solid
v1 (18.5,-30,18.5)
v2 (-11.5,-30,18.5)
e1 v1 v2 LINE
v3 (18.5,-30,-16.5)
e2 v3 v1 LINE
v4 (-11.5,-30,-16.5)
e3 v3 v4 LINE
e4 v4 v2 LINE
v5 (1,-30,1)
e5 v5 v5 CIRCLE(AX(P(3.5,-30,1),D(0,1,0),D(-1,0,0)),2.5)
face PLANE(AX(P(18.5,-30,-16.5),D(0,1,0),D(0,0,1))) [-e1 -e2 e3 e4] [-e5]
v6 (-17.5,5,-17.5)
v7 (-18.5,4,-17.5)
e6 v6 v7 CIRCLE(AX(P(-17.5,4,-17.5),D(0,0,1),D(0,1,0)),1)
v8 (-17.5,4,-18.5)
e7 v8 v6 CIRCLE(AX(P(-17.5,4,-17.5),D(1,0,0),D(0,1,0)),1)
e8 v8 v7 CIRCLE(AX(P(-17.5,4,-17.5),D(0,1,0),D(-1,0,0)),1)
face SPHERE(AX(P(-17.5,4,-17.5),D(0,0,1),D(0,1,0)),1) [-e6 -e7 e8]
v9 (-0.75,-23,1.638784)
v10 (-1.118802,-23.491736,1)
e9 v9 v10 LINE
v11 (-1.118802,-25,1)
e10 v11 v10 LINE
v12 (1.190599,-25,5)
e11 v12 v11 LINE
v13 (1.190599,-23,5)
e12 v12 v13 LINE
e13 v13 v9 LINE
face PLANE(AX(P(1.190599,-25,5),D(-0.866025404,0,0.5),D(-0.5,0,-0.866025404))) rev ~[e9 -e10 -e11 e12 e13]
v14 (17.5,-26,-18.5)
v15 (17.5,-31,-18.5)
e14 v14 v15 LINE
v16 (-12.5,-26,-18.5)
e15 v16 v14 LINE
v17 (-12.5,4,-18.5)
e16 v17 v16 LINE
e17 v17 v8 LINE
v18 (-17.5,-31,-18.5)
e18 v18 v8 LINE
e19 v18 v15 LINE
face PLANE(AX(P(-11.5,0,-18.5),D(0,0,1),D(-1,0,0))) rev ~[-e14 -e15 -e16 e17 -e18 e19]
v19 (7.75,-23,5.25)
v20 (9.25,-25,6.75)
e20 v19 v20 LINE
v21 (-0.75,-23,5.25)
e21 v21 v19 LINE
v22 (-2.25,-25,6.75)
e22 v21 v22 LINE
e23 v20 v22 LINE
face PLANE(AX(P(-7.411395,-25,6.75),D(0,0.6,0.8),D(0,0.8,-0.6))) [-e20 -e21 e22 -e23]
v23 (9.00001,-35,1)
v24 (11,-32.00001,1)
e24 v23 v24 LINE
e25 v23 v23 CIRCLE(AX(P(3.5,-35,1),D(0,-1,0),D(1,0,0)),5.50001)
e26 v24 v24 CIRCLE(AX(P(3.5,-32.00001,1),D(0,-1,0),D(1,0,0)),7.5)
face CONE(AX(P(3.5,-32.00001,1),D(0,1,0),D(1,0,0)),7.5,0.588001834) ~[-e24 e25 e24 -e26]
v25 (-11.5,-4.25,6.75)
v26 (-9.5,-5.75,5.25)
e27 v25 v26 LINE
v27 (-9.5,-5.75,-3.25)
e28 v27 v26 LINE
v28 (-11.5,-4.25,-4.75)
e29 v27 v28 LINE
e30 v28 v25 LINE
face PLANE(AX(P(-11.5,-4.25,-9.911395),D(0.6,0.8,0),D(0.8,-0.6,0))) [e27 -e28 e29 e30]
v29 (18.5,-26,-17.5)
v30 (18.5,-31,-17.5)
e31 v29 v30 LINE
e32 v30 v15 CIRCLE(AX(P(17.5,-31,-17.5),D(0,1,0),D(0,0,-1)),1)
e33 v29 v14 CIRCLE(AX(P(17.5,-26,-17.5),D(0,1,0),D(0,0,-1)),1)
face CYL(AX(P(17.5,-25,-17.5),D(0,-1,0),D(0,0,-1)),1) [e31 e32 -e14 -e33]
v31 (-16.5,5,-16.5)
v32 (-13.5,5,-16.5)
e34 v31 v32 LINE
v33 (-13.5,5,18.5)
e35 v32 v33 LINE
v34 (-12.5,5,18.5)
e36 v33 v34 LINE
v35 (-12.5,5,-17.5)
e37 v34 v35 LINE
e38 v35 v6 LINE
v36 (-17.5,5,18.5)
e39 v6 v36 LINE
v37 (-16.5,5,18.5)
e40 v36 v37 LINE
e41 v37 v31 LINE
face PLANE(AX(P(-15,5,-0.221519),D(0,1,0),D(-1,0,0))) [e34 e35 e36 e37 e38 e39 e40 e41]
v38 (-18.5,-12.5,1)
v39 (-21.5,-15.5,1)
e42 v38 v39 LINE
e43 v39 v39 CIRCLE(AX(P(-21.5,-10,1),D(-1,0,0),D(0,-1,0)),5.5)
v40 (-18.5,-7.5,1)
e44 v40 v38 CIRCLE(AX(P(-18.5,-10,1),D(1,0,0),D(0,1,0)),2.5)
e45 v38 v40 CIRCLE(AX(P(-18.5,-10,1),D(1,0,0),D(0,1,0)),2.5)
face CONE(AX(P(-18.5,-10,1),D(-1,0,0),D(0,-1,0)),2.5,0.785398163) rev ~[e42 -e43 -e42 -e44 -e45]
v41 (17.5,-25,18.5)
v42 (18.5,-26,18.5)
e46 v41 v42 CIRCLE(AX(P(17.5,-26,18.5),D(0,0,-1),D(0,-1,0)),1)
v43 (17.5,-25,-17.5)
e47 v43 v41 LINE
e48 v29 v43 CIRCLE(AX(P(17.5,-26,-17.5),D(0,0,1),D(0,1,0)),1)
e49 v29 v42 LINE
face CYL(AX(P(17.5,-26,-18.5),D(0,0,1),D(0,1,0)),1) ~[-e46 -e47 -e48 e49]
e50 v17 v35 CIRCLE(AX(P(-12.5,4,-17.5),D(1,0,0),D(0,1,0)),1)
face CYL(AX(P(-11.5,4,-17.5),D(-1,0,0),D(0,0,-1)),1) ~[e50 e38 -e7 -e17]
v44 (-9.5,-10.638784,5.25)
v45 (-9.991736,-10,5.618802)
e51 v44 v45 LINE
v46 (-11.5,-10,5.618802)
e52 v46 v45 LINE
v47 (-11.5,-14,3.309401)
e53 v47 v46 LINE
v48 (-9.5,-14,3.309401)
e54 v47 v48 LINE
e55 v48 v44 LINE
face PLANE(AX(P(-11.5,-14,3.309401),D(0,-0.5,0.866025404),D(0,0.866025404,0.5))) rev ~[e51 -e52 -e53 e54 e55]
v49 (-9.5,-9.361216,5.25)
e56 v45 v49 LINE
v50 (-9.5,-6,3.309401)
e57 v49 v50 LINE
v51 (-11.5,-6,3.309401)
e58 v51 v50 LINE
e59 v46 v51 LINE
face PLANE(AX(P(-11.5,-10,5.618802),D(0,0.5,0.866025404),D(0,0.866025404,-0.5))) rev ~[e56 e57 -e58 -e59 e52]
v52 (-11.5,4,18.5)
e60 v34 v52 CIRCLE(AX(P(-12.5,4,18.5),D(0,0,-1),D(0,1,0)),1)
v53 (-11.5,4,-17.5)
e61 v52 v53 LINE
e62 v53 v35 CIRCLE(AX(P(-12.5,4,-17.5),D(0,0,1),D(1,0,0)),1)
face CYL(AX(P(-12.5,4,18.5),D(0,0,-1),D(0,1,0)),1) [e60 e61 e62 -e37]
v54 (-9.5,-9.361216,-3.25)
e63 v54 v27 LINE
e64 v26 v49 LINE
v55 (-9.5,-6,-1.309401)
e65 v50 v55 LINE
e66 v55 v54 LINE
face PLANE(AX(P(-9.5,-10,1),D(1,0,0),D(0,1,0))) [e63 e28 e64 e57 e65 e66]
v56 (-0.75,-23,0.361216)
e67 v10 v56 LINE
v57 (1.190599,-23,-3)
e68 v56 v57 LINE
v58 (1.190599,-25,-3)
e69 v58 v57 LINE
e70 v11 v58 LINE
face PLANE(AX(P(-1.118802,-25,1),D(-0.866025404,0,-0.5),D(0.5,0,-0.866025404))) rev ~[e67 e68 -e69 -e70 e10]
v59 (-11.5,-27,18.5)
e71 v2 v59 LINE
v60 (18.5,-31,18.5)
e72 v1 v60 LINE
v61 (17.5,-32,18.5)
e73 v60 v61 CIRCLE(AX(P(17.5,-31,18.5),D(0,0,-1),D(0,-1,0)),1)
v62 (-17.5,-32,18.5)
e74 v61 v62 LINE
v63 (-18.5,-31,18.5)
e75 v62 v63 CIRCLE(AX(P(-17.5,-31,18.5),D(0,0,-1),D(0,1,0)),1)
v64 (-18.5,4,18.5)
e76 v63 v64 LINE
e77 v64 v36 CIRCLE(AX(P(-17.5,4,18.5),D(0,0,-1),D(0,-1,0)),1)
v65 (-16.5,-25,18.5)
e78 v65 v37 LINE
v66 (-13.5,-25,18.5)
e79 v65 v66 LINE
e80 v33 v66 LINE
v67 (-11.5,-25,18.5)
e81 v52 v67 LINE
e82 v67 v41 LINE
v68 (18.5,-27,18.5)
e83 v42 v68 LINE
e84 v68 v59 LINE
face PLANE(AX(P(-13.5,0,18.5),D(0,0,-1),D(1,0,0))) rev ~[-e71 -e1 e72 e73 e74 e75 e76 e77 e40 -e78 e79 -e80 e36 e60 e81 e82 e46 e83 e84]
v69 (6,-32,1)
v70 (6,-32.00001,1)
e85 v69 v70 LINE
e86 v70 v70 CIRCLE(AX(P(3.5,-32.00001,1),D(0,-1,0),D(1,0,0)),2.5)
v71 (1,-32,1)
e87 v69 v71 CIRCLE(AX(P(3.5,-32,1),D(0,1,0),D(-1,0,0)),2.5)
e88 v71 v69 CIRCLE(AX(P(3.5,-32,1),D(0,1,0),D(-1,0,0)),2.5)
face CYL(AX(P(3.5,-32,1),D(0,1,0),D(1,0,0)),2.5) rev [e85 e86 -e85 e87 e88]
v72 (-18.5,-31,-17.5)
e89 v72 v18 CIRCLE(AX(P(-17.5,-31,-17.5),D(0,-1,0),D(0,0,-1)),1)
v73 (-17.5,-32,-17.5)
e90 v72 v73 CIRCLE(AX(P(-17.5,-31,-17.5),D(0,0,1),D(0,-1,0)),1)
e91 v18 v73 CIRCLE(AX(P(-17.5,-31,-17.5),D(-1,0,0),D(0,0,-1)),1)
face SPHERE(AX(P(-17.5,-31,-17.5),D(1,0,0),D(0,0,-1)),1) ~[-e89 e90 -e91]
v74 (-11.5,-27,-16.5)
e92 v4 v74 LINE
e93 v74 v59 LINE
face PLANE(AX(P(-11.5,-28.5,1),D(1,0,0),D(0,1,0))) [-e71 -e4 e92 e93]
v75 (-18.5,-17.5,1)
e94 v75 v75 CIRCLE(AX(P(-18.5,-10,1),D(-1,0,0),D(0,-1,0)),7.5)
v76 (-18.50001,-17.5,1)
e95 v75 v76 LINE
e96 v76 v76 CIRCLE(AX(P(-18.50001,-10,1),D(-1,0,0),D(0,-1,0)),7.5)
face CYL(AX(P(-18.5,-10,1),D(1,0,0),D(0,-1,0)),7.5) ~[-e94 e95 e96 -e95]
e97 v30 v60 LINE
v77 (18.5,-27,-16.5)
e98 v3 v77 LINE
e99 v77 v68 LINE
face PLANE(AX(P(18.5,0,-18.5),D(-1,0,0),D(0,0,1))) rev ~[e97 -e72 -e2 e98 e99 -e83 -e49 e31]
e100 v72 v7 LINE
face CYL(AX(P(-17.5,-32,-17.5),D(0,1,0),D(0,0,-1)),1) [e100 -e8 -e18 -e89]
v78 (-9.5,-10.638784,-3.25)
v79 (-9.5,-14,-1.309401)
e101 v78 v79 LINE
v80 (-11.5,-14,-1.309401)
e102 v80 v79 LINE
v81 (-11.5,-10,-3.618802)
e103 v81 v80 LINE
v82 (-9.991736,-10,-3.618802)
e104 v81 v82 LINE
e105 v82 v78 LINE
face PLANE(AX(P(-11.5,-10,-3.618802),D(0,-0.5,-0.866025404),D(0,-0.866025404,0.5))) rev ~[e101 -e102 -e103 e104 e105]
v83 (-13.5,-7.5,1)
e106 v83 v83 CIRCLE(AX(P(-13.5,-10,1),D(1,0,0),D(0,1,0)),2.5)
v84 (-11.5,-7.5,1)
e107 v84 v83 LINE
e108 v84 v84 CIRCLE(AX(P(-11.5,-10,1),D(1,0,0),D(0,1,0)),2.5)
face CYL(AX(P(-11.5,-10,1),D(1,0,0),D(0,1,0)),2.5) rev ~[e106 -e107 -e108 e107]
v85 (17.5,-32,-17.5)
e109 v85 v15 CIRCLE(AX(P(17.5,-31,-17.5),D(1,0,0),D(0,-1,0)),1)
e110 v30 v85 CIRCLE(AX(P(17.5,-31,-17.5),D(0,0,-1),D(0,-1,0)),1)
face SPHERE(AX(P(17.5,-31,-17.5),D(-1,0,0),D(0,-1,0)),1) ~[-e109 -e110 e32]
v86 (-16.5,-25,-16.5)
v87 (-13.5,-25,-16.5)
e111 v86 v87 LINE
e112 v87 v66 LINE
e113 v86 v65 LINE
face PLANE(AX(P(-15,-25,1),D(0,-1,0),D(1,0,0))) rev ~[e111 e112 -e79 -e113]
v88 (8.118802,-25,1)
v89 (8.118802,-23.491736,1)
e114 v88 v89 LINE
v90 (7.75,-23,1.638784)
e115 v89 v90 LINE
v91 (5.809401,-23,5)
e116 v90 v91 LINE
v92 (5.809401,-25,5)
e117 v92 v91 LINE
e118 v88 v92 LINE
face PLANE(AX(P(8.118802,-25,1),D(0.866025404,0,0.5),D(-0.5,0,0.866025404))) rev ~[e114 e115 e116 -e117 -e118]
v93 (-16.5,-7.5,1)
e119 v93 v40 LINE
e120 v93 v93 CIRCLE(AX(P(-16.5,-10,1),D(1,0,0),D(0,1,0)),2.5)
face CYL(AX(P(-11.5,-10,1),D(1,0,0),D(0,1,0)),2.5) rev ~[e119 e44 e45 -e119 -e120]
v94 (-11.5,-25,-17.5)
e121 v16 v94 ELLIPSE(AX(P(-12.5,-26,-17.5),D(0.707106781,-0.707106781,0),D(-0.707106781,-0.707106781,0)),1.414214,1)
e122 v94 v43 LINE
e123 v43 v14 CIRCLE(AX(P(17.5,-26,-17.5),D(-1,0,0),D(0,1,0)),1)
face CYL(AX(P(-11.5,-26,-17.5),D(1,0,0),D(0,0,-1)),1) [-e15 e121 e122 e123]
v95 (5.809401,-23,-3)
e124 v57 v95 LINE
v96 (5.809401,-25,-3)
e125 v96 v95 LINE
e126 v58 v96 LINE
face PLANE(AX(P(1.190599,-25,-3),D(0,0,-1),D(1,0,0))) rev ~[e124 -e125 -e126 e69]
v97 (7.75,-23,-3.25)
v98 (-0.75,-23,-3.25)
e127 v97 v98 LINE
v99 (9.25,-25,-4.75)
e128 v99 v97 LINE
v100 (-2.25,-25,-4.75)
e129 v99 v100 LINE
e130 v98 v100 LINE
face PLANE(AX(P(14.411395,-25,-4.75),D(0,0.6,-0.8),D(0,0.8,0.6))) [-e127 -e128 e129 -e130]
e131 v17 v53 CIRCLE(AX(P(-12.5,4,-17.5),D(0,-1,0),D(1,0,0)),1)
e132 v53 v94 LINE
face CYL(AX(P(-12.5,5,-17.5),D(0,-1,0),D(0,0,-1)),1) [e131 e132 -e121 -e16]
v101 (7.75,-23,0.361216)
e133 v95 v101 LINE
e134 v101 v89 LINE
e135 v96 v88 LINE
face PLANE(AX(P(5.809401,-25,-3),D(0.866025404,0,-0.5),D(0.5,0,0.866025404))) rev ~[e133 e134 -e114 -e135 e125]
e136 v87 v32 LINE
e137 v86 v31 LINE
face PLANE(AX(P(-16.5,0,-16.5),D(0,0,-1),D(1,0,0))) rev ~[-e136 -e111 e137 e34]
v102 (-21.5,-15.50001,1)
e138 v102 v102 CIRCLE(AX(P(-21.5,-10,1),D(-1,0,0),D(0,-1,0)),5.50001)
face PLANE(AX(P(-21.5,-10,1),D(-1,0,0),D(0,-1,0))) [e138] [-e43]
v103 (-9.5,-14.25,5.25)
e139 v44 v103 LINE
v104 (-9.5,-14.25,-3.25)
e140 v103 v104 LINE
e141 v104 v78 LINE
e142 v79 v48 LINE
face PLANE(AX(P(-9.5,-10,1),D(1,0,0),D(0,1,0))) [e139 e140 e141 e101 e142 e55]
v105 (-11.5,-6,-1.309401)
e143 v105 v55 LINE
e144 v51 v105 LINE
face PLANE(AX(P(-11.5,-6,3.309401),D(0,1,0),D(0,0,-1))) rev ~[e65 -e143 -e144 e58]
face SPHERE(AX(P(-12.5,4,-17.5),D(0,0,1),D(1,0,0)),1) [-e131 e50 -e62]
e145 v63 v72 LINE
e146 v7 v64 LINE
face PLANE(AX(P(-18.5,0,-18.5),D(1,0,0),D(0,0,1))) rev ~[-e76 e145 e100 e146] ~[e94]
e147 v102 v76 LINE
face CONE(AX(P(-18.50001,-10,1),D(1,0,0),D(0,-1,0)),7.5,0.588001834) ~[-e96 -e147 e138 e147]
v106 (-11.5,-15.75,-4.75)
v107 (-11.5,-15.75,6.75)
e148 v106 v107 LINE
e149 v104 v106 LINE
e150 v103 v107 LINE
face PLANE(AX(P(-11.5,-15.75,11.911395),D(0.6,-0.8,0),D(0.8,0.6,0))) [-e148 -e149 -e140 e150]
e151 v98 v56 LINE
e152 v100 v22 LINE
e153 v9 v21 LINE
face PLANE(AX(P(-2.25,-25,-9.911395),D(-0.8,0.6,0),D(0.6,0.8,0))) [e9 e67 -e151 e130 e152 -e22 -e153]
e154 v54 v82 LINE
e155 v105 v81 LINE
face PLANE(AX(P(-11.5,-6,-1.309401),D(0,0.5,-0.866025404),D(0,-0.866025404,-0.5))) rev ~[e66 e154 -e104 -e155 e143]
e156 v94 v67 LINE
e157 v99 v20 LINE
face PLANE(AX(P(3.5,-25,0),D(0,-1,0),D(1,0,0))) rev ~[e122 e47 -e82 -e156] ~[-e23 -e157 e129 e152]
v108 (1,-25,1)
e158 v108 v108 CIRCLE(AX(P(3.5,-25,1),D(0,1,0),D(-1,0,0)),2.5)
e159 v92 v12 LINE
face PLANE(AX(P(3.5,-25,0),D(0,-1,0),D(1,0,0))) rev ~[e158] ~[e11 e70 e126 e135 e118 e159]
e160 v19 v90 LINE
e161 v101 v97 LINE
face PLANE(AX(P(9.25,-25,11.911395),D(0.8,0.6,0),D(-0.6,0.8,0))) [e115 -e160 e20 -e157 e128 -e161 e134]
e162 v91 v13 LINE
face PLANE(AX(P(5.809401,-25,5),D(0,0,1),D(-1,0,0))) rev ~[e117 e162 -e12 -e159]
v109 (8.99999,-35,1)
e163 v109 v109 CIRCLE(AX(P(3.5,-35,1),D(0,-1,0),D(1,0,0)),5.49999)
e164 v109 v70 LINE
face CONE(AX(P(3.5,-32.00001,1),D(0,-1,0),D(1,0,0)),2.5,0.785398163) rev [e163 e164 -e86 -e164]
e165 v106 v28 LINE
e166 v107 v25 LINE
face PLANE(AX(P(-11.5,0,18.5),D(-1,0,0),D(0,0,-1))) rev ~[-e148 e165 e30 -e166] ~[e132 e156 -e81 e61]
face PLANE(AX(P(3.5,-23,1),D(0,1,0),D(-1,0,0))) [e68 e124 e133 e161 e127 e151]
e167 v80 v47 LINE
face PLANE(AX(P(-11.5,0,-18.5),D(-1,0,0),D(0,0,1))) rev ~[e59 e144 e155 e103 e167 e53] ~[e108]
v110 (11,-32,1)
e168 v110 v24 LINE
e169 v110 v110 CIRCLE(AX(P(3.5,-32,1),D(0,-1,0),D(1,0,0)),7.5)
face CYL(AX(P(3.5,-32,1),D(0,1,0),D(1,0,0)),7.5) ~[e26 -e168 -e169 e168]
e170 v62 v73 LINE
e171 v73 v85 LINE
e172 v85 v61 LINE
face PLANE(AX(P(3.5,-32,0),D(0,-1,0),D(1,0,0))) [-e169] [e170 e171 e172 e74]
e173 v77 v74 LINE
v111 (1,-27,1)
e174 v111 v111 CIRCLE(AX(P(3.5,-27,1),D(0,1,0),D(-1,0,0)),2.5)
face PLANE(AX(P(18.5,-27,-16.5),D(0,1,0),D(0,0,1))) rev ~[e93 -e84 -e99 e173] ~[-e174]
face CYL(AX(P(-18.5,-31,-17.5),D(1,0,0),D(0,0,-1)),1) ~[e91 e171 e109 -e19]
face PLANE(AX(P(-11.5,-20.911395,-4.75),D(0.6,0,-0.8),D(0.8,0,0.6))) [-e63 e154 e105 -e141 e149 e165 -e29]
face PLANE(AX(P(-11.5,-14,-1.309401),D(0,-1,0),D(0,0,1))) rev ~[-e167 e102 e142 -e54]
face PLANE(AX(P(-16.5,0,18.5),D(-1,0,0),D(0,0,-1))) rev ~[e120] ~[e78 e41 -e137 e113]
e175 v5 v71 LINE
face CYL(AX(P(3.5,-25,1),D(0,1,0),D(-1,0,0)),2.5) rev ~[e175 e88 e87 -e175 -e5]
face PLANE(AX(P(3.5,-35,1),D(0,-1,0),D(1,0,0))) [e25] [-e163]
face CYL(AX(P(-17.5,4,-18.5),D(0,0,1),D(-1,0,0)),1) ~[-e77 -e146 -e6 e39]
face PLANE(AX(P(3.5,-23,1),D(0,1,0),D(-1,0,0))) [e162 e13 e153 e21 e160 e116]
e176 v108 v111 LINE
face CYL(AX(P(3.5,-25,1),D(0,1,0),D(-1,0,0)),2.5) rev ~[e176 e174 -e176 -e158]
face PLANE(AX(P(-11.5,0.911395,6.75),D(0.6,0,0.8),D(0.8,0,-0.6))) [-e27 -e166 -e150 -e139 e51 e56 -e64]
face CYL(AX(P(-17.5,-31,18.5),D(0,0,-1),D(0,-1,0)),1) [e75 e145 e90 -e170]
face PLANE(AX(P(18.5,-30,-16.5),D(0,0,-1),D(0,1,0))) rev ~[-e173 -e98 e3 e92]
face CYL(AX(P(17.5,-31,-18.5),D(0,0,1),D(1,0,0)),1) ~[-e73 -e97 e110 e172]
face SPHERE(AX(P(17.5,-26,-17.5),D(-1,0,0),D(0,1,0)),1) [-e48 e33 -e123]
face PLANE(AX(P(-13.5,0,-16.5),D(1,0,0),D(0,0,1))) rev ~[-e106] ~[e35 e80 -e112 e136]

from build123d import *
from build123d import SkipClean  # not in build123d's __all__

# Parameters (mm, degrees)
F0_W          = 30
F0_H          = 37
F0_W_2        = 3
F0_H_2        = 35
F1_DEPTH      = 32
F2_DEPTH      = 25
F3_W          = 3
F3_H          = 35
F4_DEPTH      = 30
F5_W          = 11.5
F5_H          = 11.5
F6_DEPTH      = 2
F5_R          = 2.5
F7_DEPTH      = 25
F8_T4_DEPTH   = 21.8227903205
F8_T9_DEPTH   = 21.8227903205
F8_T14_DEPTH  = 21.8227903205
F8_T19_DEPTH  = 21.8227903205
F9_R          = 7.5
F9_R_2        = 2.5
F10_DEPTH     = 3
F11_SIZE      = 2.99999
F12_W         = 11.5
F12_H         = 11.5
F13_DEPTH     = 2
F14_T4_DEPTH  = 21.8227903205
F14_T9_DEPTH  = 21.8227903205
F14_T14_DEPTH = 21.8227903205
F14_T19_DEPTH = 21.8227903205
F12_R         = 2.5
F15_DEPTH     = 25
F16_R         = 7.5
F16_R_2       = 2.5
F17_DEPTH     = 3
F19_SIZE2     = 2.99999
F19_SIZE      = 1.99999
F19_2_SIZE2   = 2.99999
F19_2_SIZE    = 1.99999
F21_DEPTH     = 5
F22_R         = 1


# Not quite as in the source:
# - a fillet or chamfer that OpenCascade refuses, or shapes differently, is made with other operations: its cross-section is extruded or revolved along the edge and cut away or added
# - a fillet or chamfer is up to 0.001 mm smaller than in the source, because OpenCascade refuses the exact size
# - after a boolean that leaves OpenCascade's solid faulty, fix() repairs it


with BuildPart() as f1:
    # F0 (on Front) → F1 (new body)
    with BuildSketch(Plane.XZ):
        with Locations((3.5, 0)):
            Rectangle(F0_W, F0_H)
        Polygon((-18.5, -18.5), (-11.5, -18.5), (-11.5, 18.5), (-13.5, 18.5), (-13.5, -16.5), (-16.5, -16.5), (-16.5, 18.5), (-18.5, 18.5), align=None)
        with Locations((-15, 1)):
            Rectangle(F0_W_2, F0_H_2)
    extrude(amount=F1_DEPTH)

    # F0 (on Front) → F2 (cut)
    with BuildSketch(Plane.XZ):
        with Locations((3.5, 0)):
            Rectangle(F0_W, F0_H)
        with Locations((-15, 1)):
            Rectangle(F0_W_2, F0_H_2)
    extrude(amount=F2_DEPTH, mode=Mode.SUBTRACT)

    # F3 (on face) → F4 (cut)
    with BuildSketch(Plane.YZ.offset(18.5)):
        with Locations((-28.5, 1)):
            Rectangle(F3_W, F3_H)
    extrude(amount=-F4_DEPTH, mode=Mode.SUBTRACT)

    # F5 (on face) → F6 (join)
    with BuildSketch(Plane(origin=(0, -25, 0), x_dir=(-1, 0, 0), z_dir=(0, 1, 0))):
        with Locations((-3.5, 1)):
            Rectangle(F5_W, F5_H)
        Polygon((-8.1188021535, 1), (-5.8094010768, 5), (-1.1905989232, 5), (1.1188021535, 1), (-1.1905989232, -3), (-5.8094010768, -3), align=None, mode=Mode.SUBTRACT)
    extrude(amount=F6_DEPTH)

    # F5 (on face) → F7 (cut)
    with BuildSketch(Plane(origin=(0, -25, 0), x_dir=(-1, 0, 0), z_dir=(0, 1, 0))):
        with Locations((-3.5, 1)):
            Circle(F5_R)
    extrude(amount=-F7_DEPTH, mode=Mode.SUBTRACT)

    # F8: chamfer of 1.5 x 2 on 4 edges, made by hand


with BuildPart() as f8_tool2:
    # F8_s3 → F8_t4 (new body)
    with BuildSketch(Plane.XY.offset(11.9113951602)):
        Polygon((9.25, -25), (7.75, -23), (9.25, -23), align=None)
    extrude(amount=-F8_T4_DEPTH)

    split(bisect_by=Plane.XZ.offset(25), keep=Keep.BOTTOM)


with BuildPart() as f1_1:
    add(f1.part, clean=False)

    # F8_t1: cut F8_tool2
    add(f8_tool2.part, mode=Mode.SUBTRACT)


with BuildPart() as f8_tool7:
    # F8_s8 → F8_t9 (new body)
    with BuildSketch(Plane.YZ.offset(-7.4113951602)):
        Polygon((-25, 6.75), (-23, 5.25), (-23, 6.75), align=None)
    extrude(amount=F8_T9_DEPTH)

    split(bisect_by=Plane.XZ.offset(25), keep=Keep.BOTTOM)


with BuildPart() as f1_2:
    add(f1_1.part, clean=False)

    # F8_t6: cut F8_tool7
    add(f8_tool7.part, mode=Mode.SUBTRACT)


with BuildPart() as f8_tool12:
    # F8_s13 → F8_t14 (new body)
    with BuildSketch(Plane.XY.offset(-9.9113951602)):
        Polygon((-2.25, -25), (-0.75, -23), (-2.25, -23), align=None)
    extrude(amount=F8_T14_DEPTH)

    split(bisect_by=Plane.XZ.offset(25), keep=Keep.BOTTOM)


with BuildPart() as f1_3:
    add(f1_2.part, clean=False)

    # F8_t11: cut F8_tool12
    add(f8_tool12.part, mode=Mode.SUBTRACT)


with BuildPart() as f8_tool17:
    # F8_s18 → F8_t19 (new body)
    with BuildSketch(Plane.YZ.offset(14.4113951602)):
        Polygon((-25, -4.75), (-23, -3.25), (-23, -4.75), align=None)
    extrude(amount=-F8_T19_DEPTH)

    split(bisect_by=Plane.XZ.offset(25), keep=Keep.BOTTOM)


with BuildPart() as f1_4:
    add(f1_3.part, clean=False)

    # F8_t16: cut F8_tool17
    add(f8_tool17.part, mode=Mode.SUBTRACT)

    # F9 (on face) → F10 (join)
    with BuildSketch(Plane.XZ.offset(32)):
        with Locations((3.5, 1)):
            Circle(F9_R)
        with Locations((3.5, 1)):
            Circle(F9_R_2, mode=Mode.SUBTRACT)
    with SkipClean():  # cleaning this boolean's faces spoils the solid; the shape is the same uncleaned
        extrude(amount=F10_DEPTH)

    # F11 (size 3 in the source; OpenCascade refuses exactly that, so slightly less here)
    f11_edges = [f1_4.edges().sort_by_distance(p)[0] for p in [
        (1, -35, 1),
    ]]
    chamfer(f11_edges, length=F11_SIZE)

    # F12 (on face) → F13 (join)
    with BuildSketch(Plane.YZ.offset(-11.5)):
        with Locations((-10, 1)):
            Rectangle(F12_W, F12_H)
        Polygon((-10, 5.6188021535), (-6, 3.3094010768), (-6, -1.3094010768), (-10, -3.6188021535), (-14, -1.3094010768), (-14, 3.3094010768), align=None, mode=Mode.SUBTRACT)
    extrude(amount=F13_DEPTH)

    add(f1_4.part.fix(), mode=Mode.REPLACE)

    # F14: chamfer of 1.5 x 2 on 4 edges, made by hand


with BuildPart() as f14_tool2:
    # F14_s3 → F14_t4 (new body)
    with BuildSketch(Plane.XY.offset(-9.9113951602)):
        Polygon((-11.5, -4.25), (-9.5, -5.75), (-9.5, -4.25), align=None)
    extrude(amount=F14_T4_DEPTH)

    split(bisect_by=Plane.YZ.offset(-11.5), keep=Keep.TOP)


with BuildPart() as f1_5:
    add(f1_4.part, clean=False)

    # F14_t1: cut F14_tool2
    add(f14_tool2.part, mode=Mode.SUBTRACT)


with BuildPart() as f14_tool7:
    # F14_s8 → F14_t9 (new body)
    with BuildSketch(Plane.XZ.offset(20.9113951602)):
        Polygon((-11.5, -4.75), (-9.5, -3.25), (-9.5, -4.75), align=None)
    extrude(amount=-F14_T9_DEPTH)

    split(bisect_by=Plane.YZ.offset(-11.5), keep=Keep.TOP)


with BuildPart() as f1_6:
    add(f1_5.part, clean=False)

    # F14_t6: cut F14_tool7
    add(f14_tool7.part, mode=Mode.SUBTRACT)


with BuildPart() as f14_tool12:
    # F14_s13 → F14_t14 (new body)
    with BuildSketch(Plane.XY.offset(11.9113951602)):
        Polygon((-11.5, -15.75), (-9.5, -14.25), (-9.5, -15.75), align=None)
    extrude(amount=-F14_T14_DEPTH)

    split(bisect_by=Plane.YZ.offset(-11.5), keep=Keep.TOP)


with BuildPart() as f1_7:
    add(f1_6.part, clean=False)

    # F14_t11: cut F14_tool12
    add(f14_tool12.part, mode=Mode.SUBTRACT)


with BuildPart() as f14_tool17:
    # F14_s18 → F14_t19 (new body)
    with BuildSketch(Plane.XZ.offset(-0.9113951602)):
        Polygon((-11.5, 6.75), (-9.5, 5.25), (-9.5, 6.75), align=None)
    extrude(amount=F14_T19_DEPTH)

    split(bisect_by=Plane.YZ.offset(-11.5), keep=Keep.TOP)


with BuildPart() as f1_8:
    add(f1_7.part, clean=False)

    # F14_t16: cut F14_tool17
    add(f14_tool17.part, mode=Mode.SUBTRACT)

    # F12 (on face) → F15 (cut)
    with BuildSketch(Plane.YZ.offset(-11.5)):
        with Locations((-10, 1)):
            Circle(F12_R)
    extrude(amount=-F15_DEPTH, mode=Mode.SUBTRACT)

    # F16 (on face) → F17 (join)
    with BuildSketch(Plane(origin=(-18.5, 0, 0), x_dir=(0, -1, 0), z_dir=(-1, 0, 0))):
        with Locations((10, 1)):
            Circle(F16_R)
        with Locations((10, 1)):
            Circle(F16_R_2, mode=Mode.SUBTRACT)
    extrude(amount=F17_DEPTH)

    # F18: chamfer of 3 on 1 edges, made by hand

    # F18_s1 → F18_t2 (revolve, cut)
    with BuildSketch(Plane.XY.offset(1)):
        Polygon((-18.5, -12.5), (-21.5, -15.5), (-21.5, -12.5), align=None)
    revolve(axis=Axis((-21.5, -10, 1), (-1, 0, 0)), mode=Mode.SUBTRACT)

    # F19 (size 2 and 3 in the source; OpenCascade refuses exactly that, so slightly less here)
    f19_edges = [f1_8.edges().sort_by_distance(p)[0] for p in [
        (-21.5, -2.5, 1),
    ]]
    f19_side = f1_8.faces().sort_by_distance((-21.5, -2.712132, 1))[0]
    chamfer(f19_edges, length=F19_SIZE, length2=F19_SIZE2, reference=f19_side)

    # F19#2 (size 2 and 3 in the source; OpenCascade refuses exactly that, so slightly less here)
    f19_2_edges = [f1_8.edges().sort_by_distance(p)[0] for p in [
        (-4, -35, 1),
    ]]
    f19_2_side = f1_8.faces().sort_by_distance((-2.212122, -35, 1))[0]
    chamfer(f19_2_edges, length=F19_2_SIZE, length2=F19_2_SIZE2, reference=f19_2_side)

    # F20 (on face) → F21 (join)
    with BuildSketch(Plane(origin=(0, 0, 0), x_dir=(-1, 0, 0), z_dir=(0, 1, 0))):
        Polygon((11.5, -4.75), (11.5, -18.5), (18.5, -18.5), (18.5, 18.5), (16.5, 18.5), (16.5, -16.5), (13.5, -16.5), (13.5, 18.5), (11.5, 18.5), (11.5, 6.75), align=None)
    extrude(amount=F21_DEPTH)

    # F22
    f22_edges = [f1_8.edges().sort_by_distance(p)[0] for p in [
        (-11.5, 5, 0),
        (-18.5, 5, 0),
        (-11.5, -10, -18.5),
        (3.5, -25, -18.5),
        (0, -32, -18.5),
        (18.5, -32, 0),
        (18.5, -25, 0),
        (-15, 5, -18.5),
        (-18.5, -13.5, -18.5),
        (18.5, -28.5, -18.5),
        (-18.5, -32, 0),
    ]]
    fillet(f22_edges, radius=F22_R)


solid = f1_8.part
